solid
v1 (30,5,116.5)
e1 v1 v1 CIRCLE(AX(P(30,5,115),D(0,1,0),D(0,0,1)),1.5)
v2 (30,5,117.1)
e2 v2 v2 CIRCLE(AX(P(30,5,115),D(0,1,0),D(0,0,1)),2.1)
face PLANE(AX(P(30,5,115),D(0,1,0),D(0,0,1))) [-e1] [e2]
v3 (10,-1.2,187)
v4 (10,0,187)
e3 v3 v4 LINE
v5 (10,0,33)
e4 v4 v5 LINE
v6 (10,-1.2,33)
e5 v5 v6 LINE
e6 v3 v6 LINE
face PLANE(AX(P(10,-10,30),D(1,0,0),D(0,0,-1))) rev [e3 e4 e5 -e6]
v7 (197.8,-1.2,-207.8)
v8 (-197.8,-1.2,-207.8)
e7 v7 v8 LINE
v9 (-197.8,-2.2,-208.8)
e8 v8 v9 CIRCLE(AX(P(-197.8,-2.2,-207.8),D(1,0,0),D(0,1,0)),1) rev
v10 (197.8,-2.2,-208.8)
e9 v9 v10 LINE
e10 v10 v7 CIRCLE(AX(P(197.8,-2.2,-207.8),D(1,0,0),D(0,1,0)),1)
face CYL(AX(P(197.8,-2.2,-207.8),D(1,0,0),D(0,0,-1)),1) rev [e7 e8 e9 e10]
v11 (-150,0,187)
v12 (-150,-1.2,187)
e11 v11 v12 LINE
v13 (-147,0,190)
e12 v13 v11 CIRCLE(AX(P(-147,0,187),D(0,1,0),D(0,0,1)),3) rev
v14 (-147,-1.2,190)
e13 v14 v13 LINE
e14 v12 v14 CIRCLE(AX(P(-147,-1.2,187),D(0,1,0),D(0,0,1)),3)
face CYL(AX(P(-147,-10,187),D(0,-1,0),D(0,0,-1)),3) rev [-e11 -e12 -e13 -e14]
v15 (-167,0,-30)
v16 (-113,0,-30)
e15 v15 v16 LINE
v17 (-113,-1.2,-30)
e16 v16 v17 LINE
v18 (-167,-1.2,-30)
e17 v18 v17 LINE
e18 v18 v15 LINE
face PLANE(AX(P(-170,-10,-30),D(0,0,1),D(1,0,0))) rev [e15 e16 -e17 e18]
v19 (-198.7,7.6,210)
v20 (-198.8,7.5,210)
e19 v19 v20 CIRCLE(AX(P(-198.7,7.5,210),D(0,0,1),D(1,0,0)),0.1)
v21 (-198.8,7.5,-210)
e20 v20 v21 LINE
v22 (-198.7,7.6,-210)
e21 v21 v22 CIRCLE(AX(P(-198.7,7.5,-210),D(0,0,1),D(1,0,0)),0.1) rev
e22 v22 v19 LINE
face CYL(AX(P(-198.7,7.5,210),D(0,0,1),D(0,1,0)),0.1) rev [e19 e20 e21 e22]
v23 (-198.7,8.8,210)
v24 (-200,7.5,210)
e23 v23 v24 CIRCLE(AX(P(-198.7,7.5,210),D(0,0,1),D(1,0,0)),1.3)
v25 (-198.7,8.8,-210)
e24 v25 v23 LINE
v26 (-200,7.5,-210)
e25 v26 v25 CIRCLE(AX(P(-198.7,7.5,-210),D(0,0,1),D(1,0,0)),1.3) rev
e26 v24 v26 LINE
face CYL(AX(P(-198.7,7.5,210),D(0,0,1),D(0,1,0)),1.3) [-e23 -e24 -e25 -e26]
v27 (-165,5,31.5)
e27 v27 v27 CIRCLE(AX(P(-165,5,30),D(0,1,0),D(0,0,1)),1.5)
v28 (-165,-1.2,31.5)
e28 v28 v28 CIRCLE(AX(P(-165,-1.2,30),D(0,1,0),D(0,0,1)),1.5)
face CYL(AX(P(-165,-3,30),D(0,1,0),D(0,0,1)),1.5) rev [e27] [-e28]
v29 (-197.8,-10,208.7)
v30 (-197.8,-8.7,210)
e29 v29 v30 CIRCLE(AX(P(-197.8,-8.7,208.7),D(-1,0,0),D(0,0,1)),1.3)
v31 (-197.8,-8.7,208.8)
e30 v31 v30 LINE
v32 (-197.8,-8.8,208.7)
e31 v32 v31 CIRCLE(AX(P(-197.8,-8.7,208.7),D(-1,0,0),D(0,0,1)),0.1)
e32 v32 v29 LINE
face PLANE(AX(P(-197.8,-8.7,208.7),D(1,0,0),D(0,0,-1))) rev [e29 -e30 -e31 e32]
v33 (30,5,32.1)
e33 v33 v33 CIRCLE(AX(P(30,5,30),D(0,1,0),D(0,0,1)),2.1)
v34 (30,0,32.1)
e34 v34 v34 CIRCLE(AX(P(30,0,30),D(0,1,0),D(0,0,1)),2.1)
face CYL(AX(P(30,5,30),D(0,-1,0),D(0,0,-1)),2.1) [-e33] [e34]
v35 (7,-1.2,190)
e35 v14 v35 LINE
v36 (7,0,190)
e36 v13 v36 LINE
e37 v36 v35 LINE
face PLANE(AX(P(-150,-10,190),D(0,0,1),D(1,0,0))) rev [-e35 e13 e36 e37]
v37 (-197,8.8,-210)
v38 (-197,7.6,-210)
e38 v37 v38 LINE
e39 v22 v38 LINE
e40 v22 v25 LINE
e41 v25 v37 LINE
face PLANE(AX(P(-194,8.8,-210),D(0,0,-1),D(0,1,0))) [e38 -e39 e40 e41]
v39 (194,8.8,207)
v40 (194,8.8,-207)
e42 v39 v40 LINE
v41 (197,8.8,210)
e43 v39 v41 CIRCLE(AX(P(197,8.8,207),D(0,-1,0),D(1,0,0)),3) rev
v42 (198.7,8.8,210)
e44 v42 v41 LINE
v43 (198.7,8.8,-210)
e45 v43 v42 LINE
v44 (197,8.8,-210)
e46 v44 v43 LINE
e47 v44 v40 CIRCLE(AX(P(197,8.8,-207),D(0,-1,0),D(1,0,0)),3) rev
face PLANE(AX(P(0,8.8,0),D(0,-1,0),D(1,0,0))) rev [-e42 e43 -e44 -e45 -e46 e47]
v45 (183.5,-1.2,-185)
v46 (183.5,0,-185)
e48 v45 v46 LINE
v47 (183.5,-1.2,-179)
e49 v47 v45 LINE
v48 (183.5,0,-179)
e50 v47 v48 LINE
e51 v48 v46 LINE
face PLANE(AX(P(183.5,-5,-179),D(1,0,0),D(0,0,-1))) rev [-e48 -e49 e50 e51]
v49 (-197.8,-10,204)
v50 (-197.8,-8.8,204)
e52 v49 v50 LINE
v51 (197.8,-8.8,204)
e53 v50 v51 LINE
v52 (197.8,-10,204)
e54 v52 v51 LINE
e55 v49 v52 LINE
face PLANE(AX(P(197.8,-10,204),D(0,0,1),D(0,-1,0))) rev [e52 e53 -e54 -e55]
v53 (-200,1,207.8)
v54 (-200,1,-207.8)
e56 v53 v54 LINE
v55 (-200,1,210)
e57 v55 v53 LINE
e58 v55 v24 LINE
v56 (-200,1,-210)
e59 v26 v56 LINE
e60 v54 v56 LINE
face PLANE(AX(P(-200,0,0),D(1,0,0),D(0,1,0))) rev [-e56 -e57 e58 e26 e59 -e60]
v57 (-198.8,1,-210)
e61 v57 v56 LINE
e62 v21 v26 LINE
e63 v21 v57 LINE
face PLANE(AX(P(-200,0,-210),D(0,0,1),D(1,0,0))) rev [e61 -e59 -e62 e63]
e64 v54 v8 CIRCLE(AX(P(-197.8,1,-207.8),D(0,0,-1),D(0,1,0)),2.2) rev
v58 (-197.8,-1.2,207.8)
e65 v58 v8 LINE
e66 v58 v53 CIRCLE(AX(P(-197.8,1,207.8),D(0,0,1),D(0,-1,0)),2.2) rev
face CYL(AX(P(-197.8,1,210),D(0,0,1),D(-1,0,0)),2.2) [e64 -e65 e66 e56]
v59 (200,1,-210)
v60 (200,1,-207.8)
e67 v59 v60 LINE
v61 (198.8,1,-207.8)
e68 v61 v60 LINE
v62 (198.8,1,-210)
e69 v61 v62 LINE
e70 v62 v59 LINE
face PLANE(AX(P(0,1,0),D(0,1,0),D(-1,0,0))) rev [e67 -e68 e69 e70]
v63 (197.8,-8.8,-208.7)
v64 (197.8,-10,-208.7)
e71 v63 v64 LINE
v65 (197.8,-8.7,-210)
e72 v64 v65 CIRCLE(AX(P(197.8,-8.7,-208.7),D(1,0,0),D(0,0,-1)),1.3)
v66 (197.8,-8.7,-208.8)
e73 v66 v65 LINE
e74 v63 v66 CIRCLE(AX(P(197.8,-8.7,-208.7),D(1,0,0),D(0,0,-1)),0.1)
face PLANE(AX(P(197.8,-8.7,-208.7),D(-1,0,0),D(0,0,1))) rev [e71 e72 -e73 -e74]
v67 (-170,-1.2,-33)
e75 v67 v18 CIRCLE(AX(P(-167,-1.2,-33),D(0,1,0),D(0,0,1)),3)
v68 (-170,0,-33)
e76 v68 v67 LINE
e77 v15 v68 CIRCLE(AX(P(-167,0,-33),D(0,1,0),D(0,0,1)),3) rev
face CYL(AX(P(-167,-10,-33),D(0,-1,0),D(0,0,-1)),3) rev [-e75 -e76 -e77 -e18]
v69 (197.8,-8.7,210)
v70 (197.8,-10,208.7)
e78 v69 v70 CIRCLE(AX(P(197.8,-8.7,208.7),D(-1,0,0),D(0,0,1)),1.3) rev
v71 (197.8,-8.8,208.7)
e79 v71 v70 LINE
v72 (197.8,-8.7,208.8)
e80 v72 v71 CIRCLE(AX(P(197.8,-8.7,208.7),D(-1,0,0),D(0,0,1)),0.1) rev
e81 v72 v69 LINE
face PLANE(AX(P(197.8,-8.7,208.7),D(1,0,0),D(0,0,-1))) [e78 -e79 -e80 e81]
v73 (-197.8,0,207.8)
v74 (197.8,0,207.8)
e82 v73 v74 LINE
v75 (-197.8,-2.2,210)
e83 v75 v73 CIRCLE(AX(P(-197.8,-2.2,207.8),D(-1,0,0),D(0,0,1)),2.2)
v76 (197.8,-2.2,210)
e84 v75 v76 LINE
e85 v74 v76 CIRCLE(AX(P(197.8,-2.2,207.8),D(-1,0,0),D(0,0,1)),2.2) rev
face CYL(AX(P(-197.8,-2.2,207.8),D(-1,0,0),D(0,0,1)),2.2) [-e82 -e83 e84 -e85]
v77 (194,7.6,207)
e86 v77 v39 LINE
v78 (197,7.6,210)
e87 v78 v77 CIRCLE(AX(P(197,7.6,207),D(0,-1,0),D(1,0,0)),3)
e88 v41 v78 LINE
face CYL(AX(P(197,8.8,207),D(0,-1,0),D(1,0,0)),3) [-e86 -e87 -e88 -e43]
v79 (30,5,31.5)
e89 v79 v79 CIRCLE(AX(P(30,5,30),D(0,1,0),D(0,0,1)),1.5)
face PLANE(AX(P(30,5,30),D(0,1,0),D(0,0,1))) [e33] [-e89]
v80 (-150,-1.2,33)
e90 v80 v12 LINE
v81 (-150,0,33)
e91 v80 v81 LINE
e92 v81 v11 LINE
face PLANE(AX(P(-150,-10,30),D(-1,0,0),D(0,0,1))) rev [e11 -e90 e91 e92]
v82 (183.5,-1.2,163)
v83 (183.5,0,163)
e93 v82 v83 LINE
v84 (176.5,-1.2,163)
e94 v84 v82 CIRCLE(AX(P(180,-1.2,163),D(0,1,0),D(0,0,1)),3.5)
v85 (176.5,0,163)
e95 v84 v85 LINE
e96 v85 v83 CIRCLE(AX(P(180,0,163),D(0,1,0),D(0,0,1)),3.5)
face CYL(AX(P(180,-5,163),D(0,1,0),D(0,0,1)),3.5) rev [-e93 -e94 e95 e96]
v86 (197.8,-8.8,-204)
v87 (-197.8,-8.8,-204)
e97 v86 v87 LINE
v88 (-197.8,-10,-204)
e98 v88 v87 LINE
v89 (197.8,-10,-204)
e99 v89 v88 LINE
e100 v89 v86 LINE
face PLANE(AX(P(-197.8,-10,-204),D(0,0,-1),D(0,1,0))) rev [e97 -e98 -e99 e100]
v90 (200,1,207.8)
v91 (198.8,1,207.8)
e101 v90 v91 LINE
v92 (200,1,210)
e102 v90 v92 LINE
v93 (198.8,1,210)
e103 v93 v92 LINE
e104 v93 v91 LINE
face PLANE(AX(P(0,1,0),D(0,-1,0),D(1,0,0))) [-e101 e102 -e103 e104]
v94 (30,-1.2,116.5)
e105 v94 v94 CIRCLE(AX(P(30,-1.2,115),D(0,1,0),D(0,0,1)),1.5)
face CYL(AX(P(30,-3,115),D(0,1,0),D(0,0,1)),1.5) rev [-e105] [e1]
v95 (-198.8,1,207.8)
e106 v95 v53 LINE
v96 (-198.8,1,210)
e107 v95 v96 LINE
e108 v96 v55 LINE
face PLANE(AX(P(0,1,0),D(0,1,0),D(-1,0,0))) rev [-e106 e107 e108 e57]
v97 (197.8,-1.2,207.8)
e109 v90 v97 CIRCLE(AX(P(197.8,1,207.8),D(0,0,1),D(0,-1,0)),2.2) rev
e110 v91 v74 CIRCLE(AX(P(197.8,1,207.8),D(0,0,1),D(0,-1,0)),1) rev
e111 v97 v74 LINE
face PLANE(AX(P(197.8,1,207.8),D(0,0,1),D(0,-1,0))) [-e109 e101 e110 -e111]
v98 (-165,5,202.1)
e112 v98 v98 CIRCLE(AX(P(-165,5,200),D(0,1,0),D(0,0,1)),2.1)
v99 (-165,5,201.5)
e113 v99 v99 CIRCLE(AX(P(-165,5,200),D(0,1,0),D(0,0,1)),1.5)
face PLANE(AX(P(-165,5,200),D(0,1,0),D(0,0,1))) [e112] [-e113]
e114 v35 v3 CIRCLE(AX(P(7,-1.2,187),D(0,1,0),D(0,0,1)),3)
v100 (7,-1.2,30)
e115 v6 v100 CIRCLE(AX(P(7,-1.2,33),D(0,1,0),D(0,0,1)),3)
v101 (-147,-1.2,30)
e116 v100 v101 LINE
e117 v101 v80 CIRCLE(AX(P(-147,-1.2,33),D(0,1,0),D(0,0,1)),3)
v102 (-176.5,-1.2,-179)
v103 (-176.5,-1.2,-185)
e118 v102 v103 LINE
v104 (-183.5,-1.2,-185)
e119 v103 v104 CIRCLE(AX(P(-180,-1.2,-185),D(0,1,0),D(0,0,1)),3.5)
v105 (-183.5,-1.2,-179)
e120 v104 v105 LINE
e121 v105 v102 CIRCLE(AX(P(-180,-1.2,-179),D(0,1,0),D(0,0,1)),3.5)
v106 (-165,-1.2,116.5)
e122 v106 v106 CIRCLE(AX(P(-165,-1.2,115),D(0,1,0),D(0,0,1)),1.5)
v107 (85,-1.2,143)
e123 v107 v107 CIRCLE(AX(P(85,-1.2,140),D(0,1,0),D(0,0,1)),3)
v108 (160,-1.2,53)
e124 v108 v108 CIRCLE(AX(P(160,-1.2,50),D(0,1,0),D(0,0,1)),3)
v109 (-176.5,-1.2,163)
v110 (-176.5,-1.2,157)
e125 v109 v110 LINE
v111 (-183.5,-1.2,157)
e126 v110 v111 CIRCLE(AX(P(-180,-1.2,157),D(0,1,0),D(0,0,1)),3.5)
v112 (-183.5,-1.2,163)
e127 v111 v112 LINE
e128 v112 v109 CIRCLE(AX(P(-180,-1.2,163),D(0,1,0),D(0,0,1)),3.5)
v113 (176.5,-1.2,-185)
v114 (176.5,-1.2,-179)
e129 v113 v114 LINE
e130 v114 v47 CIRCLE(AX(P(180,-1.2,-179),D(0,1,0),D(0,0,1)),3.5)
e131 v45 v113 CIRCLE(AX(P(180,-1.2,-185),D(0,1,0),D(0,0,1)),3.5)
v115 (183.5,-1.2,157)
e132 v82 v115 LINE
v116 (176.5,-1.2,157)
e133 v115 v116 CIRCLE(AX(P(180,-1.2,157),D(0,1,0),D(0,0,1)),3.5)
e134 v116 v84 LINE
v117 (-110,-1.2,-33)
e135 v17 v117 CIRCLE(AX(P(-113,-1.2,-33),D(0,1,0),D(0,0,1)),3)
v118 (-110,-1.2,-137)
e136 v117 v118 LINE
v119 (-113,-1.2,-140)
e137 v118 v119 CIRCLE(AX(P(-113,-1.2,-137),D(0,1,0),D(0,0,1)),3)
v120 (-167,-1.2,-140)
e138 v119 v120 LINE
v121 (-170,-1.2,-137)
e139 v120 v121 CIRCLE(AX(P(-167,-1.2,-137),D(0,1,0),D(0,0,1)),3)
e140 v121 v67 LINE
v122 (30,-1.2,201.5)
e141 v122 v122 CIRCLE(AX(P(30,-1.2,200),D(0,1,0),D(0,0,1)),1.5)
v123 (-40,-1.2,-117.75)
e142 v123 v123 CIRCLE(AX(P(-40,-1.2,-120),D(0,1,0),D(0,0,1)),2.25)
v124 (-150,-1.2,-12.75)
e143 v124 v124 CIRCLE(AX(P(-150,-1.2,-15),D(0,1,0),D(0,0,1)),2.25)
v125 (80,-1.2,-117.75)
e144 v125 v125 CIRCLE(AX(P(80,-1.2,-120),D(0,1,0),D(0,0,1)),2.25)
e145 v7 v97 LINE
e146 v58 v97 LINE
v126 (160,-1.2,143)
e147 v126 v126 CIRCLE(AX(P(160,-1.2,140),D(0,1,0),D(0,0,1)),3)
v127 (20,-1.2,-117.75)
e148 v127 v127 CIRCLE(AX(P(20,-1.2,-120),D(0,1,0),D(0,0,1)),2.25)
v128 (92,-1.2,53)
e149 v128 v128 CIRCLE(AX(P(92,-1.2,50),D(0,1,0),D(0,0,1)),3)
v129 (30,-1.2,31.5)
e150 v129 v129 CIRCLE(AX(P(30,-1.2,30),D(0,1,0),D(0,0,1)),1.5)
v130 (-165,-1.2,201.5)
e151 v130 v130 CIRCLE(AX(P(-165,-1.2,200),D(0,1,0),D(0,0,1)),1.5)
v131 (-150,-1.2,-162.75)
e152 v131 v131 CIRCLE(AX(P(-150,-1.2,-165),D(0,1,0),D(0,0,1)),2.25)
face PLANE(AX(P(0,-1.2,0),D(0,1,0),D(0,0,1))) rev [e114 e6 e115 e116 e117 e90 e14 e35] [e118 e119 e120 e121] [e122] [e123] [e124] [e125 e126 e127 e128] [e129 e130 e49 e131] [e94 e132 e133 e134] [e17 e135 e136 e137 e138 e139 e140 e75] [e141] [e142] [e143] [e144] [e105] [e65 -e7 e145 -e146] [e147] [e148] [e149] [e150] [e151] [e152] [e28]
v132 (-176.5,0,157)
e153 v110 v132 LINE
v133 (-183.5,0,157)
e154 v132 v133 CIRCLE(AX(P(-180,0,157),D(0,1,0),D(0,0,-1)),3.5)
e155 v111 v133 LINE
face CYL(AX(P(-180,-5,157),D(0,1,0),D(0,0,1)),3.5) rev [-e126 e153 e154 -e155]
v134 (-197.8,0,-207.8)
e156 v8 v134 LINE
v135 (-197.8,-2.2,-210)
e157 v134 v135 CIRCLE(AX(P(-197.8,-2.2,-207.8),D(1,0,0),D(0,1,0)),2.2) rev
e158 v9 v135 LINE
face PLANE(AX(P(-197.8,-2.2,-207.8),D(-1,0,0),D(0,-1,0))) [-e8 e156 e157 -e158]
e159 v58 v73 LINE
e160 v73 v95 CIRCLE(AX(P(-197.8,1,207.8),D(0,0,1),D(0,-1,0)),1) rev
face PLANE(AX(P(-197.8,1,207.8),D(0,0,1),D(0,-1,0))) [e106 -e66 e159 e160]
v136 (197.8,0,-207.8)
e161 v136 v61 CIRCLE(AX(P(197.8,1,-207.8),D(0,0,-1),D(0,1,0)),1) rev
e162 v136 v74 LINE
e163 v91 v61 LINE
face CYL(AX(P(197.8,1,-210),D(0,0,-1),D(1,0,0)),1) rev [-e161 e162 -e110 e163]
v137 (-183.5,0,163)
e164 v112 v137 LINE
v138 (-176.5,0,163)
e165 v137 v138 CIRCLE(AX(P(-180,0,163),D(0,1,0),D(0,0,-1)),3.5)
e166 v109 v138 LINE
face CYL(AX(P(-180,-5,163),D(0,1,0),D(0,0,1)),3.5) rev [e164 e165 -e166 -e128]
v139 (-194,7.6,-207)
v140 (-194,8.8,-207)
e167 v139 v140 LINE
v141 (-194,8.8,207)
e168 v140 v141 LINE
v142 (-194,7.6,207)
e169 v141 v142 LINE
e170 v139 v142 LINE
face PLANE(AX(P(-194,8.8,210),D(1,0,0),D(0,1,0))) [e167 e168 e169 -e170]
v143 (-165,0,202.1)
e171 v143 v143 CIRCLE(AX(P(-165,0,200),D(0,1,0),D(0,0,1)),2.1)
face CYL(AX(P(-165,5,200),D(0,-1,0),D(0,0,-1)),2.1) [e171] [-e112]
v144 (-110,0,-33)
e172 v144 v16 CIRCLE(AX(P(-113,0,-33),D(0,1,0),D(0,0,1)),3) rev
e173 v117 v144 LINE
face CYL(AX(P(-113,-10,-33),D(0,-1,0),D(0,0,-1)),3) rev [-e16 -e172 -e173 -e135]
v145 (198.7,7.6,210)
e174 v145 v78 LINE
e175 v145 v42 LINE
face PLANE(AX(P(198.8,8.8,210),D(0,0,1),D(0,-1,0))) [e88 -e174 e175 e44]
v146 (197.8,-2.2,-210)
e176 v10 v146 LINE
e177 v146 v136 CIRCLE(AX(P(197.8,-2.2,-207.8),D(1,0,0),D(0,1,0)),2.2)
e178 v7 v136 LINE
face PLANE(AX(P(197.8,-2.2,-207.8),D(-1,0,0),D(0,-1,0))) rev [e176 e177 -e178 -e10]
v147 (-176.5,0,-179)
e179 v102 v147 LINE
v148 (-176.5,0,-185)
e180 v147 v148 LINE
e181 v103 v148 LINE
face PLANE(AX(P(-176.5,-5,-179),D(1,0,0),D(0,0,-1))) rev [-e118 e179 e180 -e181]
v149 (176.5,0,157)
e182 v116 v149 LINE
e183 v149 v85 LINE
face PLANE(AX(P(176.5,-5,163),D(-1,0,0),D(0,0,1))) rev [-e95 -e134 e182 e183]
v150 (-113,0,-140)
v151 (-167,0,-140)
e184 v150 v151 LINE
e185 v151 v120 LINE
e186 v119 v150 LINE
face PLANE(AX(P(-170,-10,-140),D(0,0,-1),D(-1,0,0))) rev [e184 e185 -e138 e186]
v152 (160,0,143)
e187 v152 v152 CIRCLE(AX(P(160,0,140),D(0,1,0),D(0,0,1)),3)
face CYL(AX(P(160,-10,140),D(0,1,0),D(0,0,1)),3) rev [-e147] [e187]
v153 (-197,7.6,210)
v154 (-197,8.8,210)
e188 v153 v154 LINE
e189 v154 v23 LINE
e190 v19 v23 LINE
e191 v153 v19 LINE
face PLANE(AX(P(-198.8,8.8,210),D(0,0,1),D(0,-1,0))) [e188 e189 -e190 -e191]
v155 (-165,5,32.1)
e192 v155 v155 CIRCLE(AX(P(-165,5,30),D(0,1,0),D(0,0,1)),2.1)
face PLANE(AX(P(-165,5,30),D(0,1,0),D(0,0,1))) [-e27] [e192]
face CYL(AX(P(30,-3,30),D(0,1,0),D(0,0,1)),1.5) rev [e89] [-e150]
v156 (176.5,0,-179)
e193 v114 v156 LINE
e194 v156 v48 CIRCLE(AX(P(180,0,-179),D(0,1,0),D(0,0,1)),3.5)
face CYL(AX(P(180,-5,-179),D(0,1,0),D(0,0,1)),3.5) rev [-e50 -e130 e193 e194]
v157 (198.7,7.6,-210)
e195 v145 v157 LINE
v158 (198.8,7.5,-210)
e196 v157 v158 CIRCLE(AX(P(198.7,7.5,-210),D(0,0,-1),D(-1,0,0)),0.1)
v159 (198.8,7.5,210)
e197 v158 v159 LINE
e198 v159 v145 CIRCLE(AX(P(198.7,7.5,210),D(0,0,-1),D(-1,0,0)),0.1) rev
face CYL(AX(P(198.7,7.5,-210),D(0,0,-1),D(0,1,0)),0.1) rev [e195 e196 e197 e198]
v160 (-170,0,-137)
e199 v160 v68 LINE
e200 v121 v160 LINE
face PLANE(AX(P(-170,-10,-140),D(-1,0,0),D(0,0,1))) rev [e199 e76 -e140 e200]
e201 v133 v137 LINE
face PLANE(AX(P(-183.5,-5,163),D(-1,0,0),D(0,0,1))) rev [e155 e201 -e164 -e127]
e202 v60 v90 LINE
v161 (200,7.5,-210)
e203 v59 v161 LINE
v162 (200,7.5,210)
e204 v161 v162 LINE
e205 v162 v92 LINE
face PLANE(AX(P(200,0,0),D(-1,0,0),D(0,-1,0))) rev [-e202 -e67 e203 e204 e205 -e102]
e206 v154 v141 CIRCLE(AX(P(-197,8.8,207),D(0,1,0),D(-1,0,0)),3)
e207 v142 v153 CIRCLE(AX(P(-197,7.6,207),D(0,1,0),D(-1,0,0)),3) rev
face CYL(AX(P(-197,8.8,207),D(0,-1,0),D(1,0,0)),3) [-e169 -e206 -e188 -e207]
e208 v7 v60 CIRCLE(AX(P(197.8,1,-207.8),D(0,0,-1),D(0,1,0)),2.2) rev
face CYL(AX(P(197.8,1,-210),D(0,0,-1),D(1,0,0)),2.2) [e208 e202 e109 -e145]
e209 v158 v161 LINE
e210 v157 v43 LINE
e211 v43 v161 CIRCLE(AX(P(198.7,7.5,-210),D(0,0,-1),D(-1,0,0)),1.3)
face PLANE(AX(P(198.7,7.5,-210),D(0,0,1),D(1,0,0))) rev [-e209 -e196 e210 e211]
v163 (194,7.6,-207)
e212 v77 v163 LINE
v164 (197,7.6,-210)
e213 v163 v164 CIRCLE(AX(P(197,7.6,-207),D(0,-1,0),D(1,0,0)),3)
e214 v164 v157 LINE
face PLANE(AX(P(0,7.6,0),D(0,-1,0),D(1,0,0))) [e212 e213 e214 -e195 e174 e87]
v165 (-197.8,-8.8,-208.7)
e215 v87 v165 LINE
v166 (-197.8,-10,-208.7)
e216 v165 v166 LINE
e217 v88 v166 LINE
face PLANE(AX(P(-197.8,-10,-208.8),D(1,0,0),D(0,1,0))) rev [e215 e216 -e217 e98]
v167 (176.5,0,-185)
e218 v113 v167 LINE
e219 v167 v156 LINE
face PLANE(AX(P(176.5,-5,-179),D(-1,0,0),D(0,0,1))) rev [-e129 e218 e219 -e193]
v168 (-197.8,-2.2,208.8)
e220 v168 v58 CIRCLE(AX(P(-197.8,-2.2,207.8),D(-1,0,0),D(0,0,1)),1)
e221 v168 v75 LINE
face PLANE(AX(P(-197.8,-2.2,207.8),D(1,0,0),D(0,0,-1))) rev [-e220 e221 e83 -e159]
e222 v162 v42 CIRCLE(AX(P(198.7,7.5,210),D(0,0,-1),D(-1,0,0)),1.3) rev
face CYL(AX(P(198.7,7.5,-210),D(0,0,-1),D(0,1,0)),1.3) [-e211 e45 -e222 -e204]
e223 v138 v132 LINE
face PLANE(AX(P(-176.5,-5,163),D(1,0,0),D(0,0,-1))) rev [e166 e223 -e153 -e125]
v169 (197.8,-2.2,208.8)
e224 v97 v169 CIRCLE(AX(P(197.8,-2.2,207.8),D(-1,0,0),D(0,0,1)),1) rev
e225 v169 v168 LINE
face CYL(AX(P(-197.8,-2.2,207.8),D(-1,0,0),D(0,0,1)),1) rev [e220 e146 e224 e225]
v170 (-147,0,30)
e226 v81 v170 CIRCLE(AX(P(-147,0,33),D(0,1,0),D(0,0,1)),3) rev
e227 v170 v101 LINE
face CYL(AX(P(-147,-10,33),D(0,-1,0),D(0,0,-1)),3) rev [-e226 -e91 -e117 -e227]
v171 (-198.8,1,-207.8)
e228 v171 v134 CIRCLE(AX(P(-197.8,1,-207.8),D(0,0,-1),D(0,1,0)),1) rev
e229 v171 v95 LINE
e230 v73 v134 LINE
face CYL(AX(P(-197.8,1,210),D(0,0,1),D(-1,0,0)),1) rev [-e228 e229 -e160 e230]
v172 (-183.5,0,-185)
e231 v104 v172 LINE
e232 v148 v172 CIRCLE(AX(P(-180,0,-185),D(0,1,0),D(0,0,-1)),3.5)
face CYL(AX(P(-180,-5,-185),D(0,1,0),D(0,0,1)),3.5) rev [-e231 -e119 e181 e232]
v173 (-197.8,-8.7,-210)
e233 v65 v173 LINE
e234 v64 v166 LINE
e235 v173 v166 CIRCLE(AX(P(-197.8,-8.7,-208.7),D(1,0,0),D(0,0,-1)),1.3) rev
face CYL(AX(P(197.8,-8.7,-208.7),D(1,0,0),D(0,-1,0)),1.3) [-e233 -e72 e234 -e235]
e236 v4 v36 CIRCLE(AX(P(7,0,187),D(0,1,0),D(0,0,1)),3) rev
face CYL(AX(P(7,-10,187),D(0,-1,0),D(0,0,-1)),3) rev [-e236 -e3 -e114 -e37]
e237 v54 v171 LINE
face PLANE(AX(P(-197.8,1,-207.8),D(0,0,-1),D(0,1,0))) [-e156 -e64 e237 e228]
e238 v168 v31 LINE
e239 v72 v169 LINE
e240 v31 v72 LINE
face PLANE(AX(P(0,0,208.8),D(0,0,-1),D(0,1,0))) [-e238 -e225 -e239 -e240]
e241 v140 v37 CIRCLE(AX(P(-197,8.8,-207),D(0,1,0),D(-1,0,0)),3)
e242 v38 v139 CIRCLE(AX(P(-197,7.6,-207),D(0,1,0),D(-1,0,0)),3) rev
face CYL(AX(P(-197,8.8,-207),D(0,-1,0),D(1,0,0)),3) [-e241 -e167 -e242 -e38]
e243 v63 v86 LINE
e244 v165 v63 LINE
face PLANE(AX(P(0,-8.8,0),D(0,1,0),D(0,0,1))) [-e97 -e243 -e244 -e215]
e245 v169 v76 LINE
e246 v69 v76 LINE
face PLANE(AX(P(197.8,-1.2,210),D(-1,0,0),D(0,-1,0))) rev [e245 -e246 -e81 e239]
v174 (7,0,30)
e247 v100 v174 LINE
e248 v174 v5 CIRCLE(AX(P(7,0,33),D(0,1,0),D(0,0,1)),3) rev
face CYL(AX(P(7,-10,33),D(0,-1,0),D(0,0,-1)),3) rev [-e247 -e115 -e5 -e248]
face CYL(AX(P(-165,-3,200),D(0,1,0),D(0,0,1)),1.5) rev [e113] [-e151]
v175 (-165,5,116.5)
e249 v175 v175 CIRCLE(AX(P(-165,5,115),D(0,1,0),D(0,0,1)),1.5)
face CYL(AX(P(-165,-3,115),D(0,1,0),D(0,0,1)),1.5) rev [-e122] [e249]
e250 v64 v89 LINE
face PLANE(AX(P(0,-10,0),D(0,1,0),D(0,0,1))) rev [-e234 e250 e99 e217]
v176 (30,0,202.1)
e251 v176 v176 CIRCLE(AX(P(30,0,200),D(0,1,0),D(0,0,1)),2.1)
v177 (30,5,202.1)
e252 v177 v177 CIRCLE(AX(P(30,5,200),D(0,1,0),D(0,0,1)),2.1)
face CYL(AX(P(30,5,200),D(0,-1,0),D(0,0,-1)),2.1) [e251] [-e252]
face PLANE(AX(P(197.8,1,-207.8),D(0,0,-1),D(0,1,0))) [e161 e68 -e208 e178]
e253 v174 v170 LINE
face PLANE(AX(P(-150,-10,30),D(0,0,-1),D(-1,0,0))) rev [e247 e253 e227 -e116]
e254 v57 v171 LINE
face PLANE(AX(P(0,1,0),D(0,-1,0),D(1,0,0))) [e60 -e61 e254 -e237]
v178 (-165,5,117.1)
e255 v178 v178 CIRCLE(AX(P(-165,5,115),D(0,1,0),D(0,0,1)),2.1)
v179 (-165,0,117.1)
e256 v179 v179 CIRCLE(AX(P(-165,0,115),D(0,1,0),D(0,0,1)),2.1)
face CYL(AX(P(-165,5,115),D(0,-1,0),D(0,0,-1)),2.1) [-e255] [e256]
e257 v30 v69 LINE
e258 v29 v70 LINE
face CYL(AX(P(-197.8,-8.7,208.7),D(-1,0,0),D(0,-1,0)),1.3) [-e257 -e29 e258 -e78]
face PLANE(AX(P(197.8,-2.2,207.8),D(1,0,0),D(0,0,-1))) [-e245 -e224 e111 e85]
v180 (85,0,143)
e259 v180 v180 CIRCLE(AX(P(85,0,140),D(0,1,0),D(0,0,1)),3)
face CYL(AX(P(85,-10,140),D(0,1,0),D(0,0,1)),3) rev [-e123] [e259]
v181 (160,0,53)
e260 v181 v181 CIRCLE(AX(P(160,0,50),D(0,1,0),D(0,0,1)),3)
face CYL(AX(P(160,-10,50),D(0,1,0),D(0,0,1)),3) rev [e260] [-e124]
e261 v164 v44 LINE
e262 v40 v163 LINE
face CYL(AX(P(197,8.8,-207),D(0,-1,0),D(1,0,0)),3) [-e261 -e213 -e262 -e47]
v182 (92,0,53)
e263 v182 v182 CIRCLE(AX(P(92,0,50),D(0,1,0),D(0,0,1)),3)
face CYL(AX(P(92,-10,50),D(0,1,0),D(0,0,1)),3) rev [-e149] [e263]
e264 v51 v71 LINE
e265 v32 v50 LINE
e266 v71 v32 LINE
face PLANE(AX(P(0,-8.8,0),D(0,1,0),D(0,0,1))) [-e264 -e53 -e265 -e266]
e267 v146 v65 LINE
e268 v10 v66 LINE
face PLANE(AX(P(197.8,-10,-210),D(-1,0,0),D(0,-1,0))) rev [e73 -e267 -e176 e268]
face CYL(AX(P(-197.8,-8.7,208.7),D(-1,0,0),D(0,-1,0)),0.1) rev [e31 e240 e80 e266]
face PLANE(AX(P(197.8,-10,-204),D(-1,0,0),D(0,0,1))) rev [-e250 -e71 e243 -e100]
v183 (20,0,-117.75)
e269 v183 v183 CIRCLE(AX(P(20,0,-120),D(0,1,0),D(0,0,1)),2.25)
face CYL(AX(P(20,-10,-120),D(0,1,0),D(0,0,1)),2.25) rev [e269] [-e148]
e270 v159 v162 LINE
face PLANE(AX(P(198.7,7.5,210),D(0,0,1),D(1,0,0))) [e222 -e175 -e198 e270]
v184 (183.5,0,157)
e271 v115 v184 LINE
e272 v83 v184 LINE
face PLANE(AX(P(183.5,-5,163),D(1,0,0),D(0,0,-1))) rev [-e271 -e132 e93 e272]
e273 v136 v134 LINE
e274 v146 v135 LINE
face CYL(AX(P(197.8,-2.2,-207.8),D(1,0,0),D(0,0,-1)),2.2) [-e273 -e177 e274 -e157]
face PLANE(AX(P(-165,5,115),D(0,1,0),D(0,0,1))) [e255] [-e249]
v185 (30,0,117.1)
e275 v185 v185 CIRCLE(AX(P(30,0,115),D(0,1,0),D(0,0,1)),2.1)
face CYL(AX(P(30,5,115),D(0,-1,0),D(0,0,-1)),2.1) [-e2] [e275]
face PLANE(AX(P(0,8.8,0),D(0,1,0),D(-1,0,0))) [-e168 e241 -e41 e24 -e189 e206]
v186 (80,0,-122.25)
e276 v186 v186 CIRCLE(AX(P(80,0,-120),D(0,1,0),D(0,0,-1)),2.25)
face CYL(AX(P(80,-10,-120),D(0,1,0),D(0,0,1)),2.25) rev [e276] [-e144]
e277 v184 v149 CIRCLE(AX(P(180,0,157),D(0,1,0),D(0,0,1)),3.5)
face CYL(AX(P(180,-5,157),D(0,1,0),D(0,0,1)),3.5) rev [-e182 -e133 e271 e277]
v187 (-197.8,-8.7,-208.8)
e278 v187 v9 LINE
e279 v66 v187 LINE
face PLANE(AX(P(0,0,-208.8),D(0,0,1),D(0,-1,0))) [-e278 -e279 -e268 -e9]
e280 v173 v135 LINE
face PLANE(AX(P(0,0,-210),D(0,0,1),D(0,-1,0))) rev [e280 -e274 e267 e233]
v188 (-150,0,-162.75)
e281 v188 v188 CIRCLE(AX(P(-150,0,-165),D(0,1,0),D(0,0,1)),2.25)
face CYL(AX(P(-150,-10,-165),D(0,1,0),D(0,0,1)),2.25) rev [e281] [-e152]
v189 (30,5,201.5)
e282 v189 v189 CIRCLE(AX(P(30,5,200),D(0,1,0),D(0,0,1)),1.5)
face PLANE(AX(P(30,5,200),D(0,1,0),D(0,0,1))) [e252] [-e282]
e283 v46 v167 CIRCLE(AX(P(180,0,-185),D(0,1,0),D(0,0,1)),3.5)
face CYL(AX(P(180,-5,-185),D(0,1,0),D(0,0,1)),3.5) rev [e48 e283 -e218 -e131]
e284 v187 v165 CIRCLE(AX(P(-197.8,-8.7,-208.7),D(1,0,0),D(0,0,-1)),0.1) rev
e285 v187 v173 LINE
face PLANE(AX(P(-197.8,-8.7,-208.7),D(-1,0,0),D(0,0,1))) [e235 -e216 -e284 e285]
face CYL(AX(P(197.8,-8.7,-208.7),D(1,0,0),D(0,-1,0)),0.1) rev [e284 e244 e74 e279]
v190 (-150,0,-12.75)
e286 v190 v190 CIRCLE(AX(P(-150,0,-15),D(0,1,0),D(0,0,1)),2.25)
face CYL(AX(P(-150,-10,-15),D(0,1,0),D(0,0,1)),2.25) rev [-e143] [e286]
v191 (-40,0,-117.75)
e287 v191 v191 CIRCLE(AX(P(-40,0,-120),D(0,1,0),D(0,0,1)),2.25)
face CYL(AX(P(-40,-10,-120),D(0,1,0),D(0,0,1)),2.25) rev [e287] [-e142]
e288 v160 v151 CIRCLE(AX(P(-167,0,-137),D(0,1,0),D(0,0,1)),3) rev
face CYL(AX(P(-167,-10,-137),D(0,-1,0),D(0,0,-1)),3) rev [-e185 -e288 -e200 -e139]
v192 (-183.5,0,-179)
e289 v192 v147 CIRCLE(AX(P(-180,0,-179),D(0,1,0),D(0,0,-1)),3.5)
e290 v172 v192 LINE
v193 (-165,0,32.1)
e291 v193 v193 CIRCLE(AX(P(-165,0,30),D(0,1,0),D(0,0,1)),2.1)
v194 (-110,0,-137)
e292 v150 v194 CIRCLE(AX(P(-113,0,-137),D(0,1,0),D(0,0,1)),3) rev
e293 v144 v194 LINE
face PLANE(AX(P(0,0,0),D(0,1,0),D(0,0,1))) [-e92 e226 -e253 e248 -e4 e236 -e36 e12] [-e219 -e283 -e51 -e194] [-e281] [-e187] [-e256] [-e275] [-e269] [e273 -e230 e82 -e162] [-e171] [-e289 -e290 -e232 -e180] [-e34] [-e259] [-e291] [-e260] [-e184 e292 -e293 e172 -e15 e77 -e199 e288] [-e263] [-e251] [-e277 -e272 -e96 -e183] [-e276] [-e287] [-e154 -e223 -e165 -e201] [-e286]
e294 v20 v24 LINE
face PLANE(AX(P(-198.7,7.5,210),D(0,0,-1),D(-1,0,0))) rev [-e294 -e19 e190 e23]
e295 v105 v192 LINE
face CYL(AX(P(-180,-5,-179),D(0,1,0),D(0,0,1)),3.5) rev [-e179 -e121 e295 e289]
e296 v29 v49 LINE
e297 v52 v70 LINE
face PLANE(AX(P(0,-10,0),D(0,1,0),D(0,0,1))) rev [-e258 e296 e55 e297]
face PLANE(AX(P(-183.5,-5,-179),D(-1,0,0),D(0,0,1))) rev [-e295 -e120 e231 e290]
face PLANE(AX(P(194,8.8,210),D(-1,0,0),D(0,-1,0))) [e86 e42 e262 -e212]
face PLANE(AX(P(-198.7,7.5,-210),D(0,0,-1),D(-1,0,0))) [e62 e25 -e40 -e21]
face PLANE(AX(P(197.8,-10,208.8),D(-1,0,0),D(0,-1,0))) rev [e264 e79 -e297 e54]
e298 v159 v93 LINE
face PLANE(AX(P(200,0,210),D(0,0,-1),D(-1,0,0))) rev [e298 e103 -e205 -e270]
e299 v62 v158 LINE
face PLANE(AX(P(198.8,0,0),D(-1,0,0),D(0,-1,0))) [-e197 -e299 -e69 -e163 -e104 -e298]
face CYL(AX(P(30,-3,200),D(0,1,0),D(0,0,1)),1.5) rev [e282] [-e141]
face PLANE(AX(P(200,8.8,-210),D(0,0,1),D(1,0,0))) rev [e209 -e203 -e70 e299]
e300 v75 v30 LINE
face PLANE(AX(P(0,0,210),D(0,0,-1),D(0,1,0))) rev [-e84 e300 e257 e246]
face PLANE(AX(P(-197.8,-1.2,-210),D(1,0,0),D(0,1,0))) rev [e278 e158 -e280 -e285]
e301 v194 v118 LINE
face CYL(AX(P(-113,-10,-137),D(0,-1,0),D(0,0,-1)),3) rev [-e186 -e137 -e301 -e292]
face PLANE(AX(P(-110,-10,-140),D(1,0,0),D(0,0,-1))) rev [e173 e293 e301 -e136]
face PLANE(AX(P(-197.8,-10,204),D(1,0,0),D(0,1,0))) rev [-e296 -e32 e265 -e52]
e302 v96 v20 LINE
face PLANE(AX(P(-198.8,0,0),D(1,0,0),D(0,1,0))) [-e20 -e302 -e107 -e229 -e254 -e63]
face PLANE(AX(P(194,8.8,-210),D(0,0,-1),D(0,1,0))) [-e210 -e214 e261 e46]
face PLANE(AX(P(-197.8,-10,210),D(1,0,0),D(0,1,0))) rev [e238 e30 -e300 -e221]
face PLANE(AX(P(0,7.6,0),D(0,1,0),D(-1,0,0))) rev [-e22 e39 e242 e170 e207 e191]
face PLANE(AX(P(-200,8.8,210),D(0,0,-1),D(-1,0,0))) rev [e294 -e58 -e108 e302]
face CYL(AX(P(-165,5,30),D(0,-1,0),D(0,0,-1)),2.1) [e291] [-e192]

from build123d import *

# Parameters (mm, degrees)
SKETCH_1_W                         = 400
SKETCH_1_H                         = 420
SM_BASE_FLANGE_1_DEPTH             = 1.2
SM_EDGE_FLANGE_1_STRIP_W           = 6.8
SM_EDGE_FLANGE_1_STRIP_H           = 1.2
SM_EDGE_FLANGE_1_STRIP_CUT_DEPTH   = 420
SM_EDGE_FLANGE_1_STRIP_2_W         = 6.8
SM_EDGE_FLANGE_1_STRIP_2_H         = 1.2
SM_EDGE_FLANGE_1_STRIP_CUT_2_DEPTH = 420
SM_EDGE_FLANGE_1_DEPTH             = 420
SM_EDGE_FLANGE_1_BEND_DEPTH        = 420
SM_EDGE_FLANGE_2_STRIP_W           = 5
SM_EDGE_FLANGE_2_STRIP_H           = 1.2
SM_EDGE_FLANGE_2_STRIP_CUT_DEPTH   = 420
SM_EDGE_FLANGE_2_STRIP_2_W         = 5
SM_EDGE_FLANGE_2_STRIP_2_H         = 1.2
SM_EDGE_FLANGE_2_STRIP_CUT_2_DEPTH = 420
SM_EDGE_FLANGE_2_DEPTH             = 420
SM_EDGE_FLANGE_2_BEND_DEPTH        = 420
SM_START                           = -201
SM_EDGE_FLANGE_3_DEPTH             = 402
SM_EDGE_FLANGE_3_2_DEPTH           = 3.2
SM_START_2                         = 197.8
SM_EDGE_FLANGE_3_3_DEPTH           = 3.2
SM_START_3                         = -197.8
SM_EDGE_FLANGE_3_4_DEPTH           = 395.6
SM_EDGE_FLANGE_4_STRIP_W           = 5
SM_EDGE_FLANGE_4_STRIP_H           = 1.2
SM_EDGE_FLANGE_4_STRIP_CUT_DEPTH   = 395.6
SM_EDGE_FLANGE_4_STRIP_2_W         = 5
SM_EDGE_FLANGE_4_STRIP_2_H         = 1.2
SM_EDGE_FLANGE_4_STRIP_CUT_2_DEPTH = 395.6
SM_EDGE_FLANGE_4_DEPTH             = 395.6
SM_EDGE_FLANGE_4_BEND_DEPTH        = 395.6
FILLET_1_R                         = 3
SKETCH_40_R                        = 2.25
CUT_EXTRUDE_2_DEPTH                = 10
SKETCH_45_R                        = 1.5
CUT_EXTRUDE_3_DEPTH                = 3
SKETCH_48_R                        = 2.25
CUT_EXTRUDE_6_DEPTH                = 10
SKETCH_50_W                        = 60
SKETCH_50_H                        = 110
CUT_EXTRUDE_7_DEPTH                = 10
SKETCH_52_W                        = 160
SKETCH_52_H                        = 160
CUT_EXTRUDE_10_DEPTH               = 10
FILLET_2_R                         = 3
FILLET_4_R                         = 3
EXTRUDE_START                      = 5
SKETCH_54_R                        = 2.1
SKETCH_54_R_2                      = 1.5
EXTRUDE_1_DEPTH                    = 5
CUT_EXTRUDE_11_DEPTH               = 5
SKETCH_56_R                        = 3
CUT_EXTRUDE_12_DEPTH               = 10


with BuildPart() as part:
    # 基体-法兰1: sheet metal written as solids
    # Sketch 1 → 基体-法兰1 (new body)
    with BuildSketch(Plane(origin=(0, 0, 0), x_dir=(1, 0, 0), z_dir=(0, 1, 0))):
        Rectangle(SKETCH_1_W, SKETCH_1_H)
    extrude(amount=-SM_BASE_FLANGE_1_DEPTH)

    # 边线-法兰1: sheet metal written as solids
    # 边线-法兰1 strip (on a plane across the edge) → 边线-法兰1 strip cut (cut)
    with BuildSketch(Plane(origin=(-200, 0, -210), x_dir=(1, 0, 0), z_dir=(0, 0, 1))):
        with Locations((-1.2, -0.6)):
            Rectangle(SM_EDGE_FLANGE_1_STRIP_W, SM_EDGE_FLANGE_1_STRIP_H)
    extrude(amount=SM_EDGE_FLANGE_1_STRIP_CUT_DEPTH, mode=Mode.SUBTRACT)

    # 边线-法兰1 strip 2 (on a plane across the edge) → 边线-法兰1 strip cut 2 (cut)
    with BuildSketch(Plane(origin=(200, 0, 210), x_dir=(-1, 0, 0), z_dir=(0, 0, -1))):
        with Locations((-1.2, -0.6)):
            Rectangle(SM_EDGE_FLANGE_1_STRIP_2_W, SM_EDGE_FLANGE_1_STRIP_2_H)
    extrude(amount=SM_EDGE_FLANGE_1_STRIP_CUT_2_DEPTH, mode=Mode.SUBTRACT)

    # 边线-法兰1 section (on a plane across the edge) → 边线-法兰1 (add)
    with BuildSketch(Plane(origin=(-200, 0, -210), x_dir=(1, 0, 0), z_dir=(0, 0, 1))):
        with BuildLine():
            Line((0, 1), (0, 8.8))
            Line((0, 8.8), (1.2, 8.8))
            Line((1.2, 8.8), (1.2, 1))
            ThreePointArc((1.2, 1), (1.492893219, 0.292893219), (2.2, 0))
            Line((2.2, 0), (2.2, -1.2))
            ThreePointArc((2.2, -1.2), (0.644365081, -0.555634919), (0, 1))
        make_face()
    extrude(amount=SM_EDGE_FLANGE_1_DEPTH)

    # 边线-法兰1 section 2 (on a plane across the edge) → 边线-法兰1 bend (add)
    with BuildSketch(Plane(origin=(200, 0, 210), x_dir=(-1, 0, 0), z_dir=(0, 0, -1))):
        with BuildLine():
            Line((0, 1), (0, 8.8))
            Line((0, 8.8), (1.2, 8.8))
            Line((1.2, 8.8), (1.2, 1))
            ThreePointArc((1.2, 1), (1.492893219, 0.292893219), (2.2, 0))
            Line((2.2, 0), (2.2, -1.2))
            ThreePointArc((2.2, -1.2), (0.644365081, -0.555634919), (0, 1))
        make_face()
    extrude(amount=SM_EDGE_FLANGE_1_BEND_DEPTH)

    # 边线-法兰2: sheet metal written as solids
    # 边线-法兰2 strip (on a plane across the edge) → 边线-法兰2 strip cut (cut)
    with BuildSketch(Plane(origin=(-198.8, 8.8, -210), x_dir=(0, -1, 0), z_dir=(0, 0, 1))):
        with Locations((-1.2, -0.6)):
            Rectangle(SM_EDGE_FLANGE_2_STRIP_W, SM_EDGE_FLANGE_2_STRIP_H)
    extrude(amount=SM_EDGE_FLANGE_2_STRIP_CUT_DEPTH, mode=Mode.SUBTRACT)

    # 边线-法兰2 strip 2 (on a plane across the edge) → 边线-法兰2 strip cut 2 (cut)
    with BuildSketch(Plane(origin=(198.8, 8.8, 210), x_dir=(0, -1, 0), z_dir=(0, 0, -1))):
        with Locations((-1.2, -0.6)):
            Rectangle(SM_EDGE_FLANGE_2_STRIP_2_W, SM_EDGE_FLANGE_2_STRIP_2_H)
    extrude(amount=SM_EDGE_FLANGE_2_STRIP_CUT_2_DEPTH, mode=Mode.SUBTRACT)

    # 边线-法兰2 section (on a plane across the edge) → 边线-法兰2 (add)
    with BuildSketch(Plane(origin=(-198.8, 8.8, -210), x_dir=(0, -1, 0), z_dir=(0, 0, 1))):
        with BuildLine():
            Line((0, 0.1), (0, 4.8))
            Line((0, 4.8), (1.2, 4.8))
            Line((1.2, 4.8), (1.2, 0.1))
            ThreePointArc((1.2, 0.1), (1.229289322, 0.029289322), (1.3, 0))
            Line((1.3, 0), (1.3, -1.2))
            ThreePointArc((1.3, -1.2), (0.380761184, -0.819238816), (0, 0.1))
        make_face()
    extrude(amount=SM_EDGE_FLANGE_2_DEPTH)

    # 边线-法兰2 section 2 (on a plane across the edge) → 边线-法兰2 bend (add)
    with BuildSketch(Plane(origin=(198.8, 8.8, 210), x_dir=(0, -1, 0), z_dir=(0, 0, -1))):
        with BuildLine():
            Line((0, 0.1), (0, 4.8))
            Line((0, 4.8), (1.2, 4.8))
            Line((1.2, 4.8), (1.2, 0.1))
            ThreePointArc((1.2, 0.1), (1.229289322, 0.029289322), (1.3, 0))
            Line((1.3, 0), (1.3, -1.2))
            ThreePointArc((1.3, -1.2), (0.380761184, -0.819238816), (0, 0.1))
        make_face()
    extrude(amount=SM_EDGE_FLANGE_2_BEND_DEPTH)

    # 边线-法兰3: read off the stored shape, not the designer's step
    # 边线-法兰3 outline → 边线-法兰3 (cut)
    with BuildSketch(Plane.YZ.offset(SM_START)):
        with BuildLine():
            Line((1, -210), (1, -207.8))
            Line((1, -207.8), (0, -207.8))
            ThreePointArc((0, -207.8), (-0.323833696, -208.94891253), (-1.2, -209.759591795))
            Line((-1.2, -209.759591795), (-1.2, -210))
            Line((-1.2, -210), (1, -210))
        make_face()
        with BuildLine():
            Line((1, 210), (-1.2, 210))
            Line((-1.2, 210), (-1.2, 209.759591795))
            ThreePointArc((-1.2, 209.759591795), (-0.323833696, 208.94891253), (0, 207.8))
            Line((0, 207.8), (1, 207.8))
            Line((1, 207.8), (1, 210))
        make_face()
    extrude(amount=SM_EDGE_FLANGE_3_DEPTH, mode=Mode.SUBTRACT)

    # Sm Edge Flange 3 2 outline → Sm Edge Flange 3 2 (cut)
    with BuildSketch(Plane.YZ.offset(SM_START)):
        with BuildLine():
            ThreePointArc((-1.2, -209.759591795), (-0.323833696, -208.94891253), (0, -207.8))
            Line((0, -207.8), (-1.2, -207.8))
            Line((-1.2, -207.8), (-1.2, -209.759591795))
        make_face()
        with BuildLine():
            Line((-1.2, 207.8), (0, 207.8))
            ThreePointArc((0, 207.8), (-0.323833696, 208.94891253), (-1.2, 209.759591795))
            Line((-1.2, 209.759591795), (-1.2, 207.8))
        make_face()
    extrude(amount=SM_EDGE_FLANGE_3_2_DEPTH, mode=Mode.SUBTRACT)

    # Sm Edge Flange 3 3 outline → Sm Edge Flange 3 3 (cut)
    with BuildSketch(Plane.YZ.offset(SM_START_2)):
        with BuildLine():
            ThreePointArc((-1.2, -209.759591795), (-0.323833696, -208.94891253), (0, -207.8))
            Line((0, -207.8), (-1.2, -207.8))
            Line((-1.2, -207.8), (-1.2, -209.759591795))
        make_face()
        with BuildLine():
            Line((-1.2, 207.8), (0, 207.8))
            ThreePointArc((0, 207.8), (-0.323833696, 208.94891253), (-1.2, 209.759591795))
            Line((-1.2, 209.759591795), (-1.2, 207.8))
        make_face()
    extrude(amount=SM_EDGE_FLANGE_3_3_DEPTH, mode=Mode.SUBTRACT)

    # Sm Edge Flange 3 4 outline → Sm Edge Flange 3 4 (add)
    with BuildSketch(Plane.YZ.offset(SM_START_3)):
        with BuildLine():
            Line((-1.2, -209.759591795), (-1.2, -207.8))
            ThreePointArc((-1.2, -207.8), (-1.492893219, -208.507106781), (-2.2, -208.8))
            Line((-2.2, -208.8), (-10, -208.8))
            Line((-10, -208.8), (-10, -210))
            Line((-10, -210), (-2.2, -210))
            ThreePointArc((-2.2, -210), (-1.685753924, -209.939053757), (-1.2, -209.759591795))
        make_face()
        with BuildLine():
            ThreePointArc((-2.2, 208.8), (-1.492893219, 208.507106781), (-1.2, 207.8))
            Line((-1.2, 207.8), (-1.2, 209.759591795))
            ThreePointArc((-1.2, 209.759591795), (-1.685753924, 209.939053757), (-2.2, 210))
            Line((-2.2, 210), (-10, 210))
            Line((-10, 210), (-10, 208.8))
            Line((-10, 208.8), (-2.2, 208.8))
        make_face()
    extrude(amount=SM_EDGE_FLANGE_3_4_DEPTH)

    # 边线-法兰4: sheet metal written as solids
    # 边线-法兰4 strip (on a plane across the edge) → 边线-法兰4 strip cut (cut)
    with BuildSketch(Plane(origin=(-197.8, -10, -208.8), x_dir=(0, 1, 0), z_dir=(1, 0, 0))):
        with Locations((-1.2, -0.6)):
            Rectangle(SM_EDGE_FLANGE_4_STRIP_W, SM_EDGE_FLANGE_4_STRIP_H)
    extrude(amount=SM_EDGE_FLANGE_4_STRIP_CUT_DEPTH, mode=Mode.SUBTRACT)

    # 边线-法兰4 strip 2 (on a plane across the edge) → 边线-法兰4 strip cut 2 (cut)
    with BuildSketch(Plane(origin=(197.8, -10, 208.8), x_dir=(0, 1, 0), z_dir=(-1, 0, 0))):
        with Locations((-1.2, -0.6)):
            Rectangle(SM_EDGE_FLANGE_4_STRIP_2_W, SM_EDGE_FLANGE_4_STRIP_2_H)
    extrude(amount=SM_EDGE_FLANGE_4_STRIP_CUT_2_DEPTH, mode=Mode.SUBTRACT)

    # 边线-法兰4 section (on a plane across the edge) → 边线-法兰4 (add)
    with BuildSketch(Plane(origin=(-197.8, -10, -208.8), x_dir=(0, 1, 0), z_dir=(1, 0, 0))):
        with BuildLine():
            Line((0, 0.1), (0, 4.8))
            Line((0, 4.8), (1.2, 4.8))
            Line((1.2, 4.8), (1.2, 0.1))
            ThreePointArc((1.2, 0.1), (1.229289322, 0.029289322), (1.3, 0))
            Line((1.3, 0), (1.3, -1.2))
            ThreePointArc((1.3, -1.2), (0.380761184, -0.819238816), (0, 0.1))
        make_face()
    extrude(amount=SM_EDGE_FLANGE_4_DEPTH)

    # 边线-法兰4 section 2 (on a plane across the edge) → 边线-法兰4 bend (add)
    with BuildSketch(Plane(origin=(197.8, -10, 208.8), x_dir=(0, 1, 0), z_dir=(-1, 0, 0))):
        with BuildLine():
            Line((0, 0.1), (0, 4.8))
            Line((0, 4.8), (1.2, 4.8))
            Line((1.2, 4.8), (1.2, 0.1))
            ThreePointArc((1.2, 0.1), (1.229289322, 0.029289322), (1.3, 0))
            Line((1.3, 0), (1.3, -1.2))
            ThreePointArc((1.3, -1.2), (0.380761184, -0.819238816), (0, 0.1))
        make_face()
    extrude(amount=SM_EDGE_FLANGE_4_BEND_DEPTH)

    # 圆角1
    fillet_1_edges = [part.edges().sort_by_distance(p)[0] for p in [
        (-194, 8.2, -210),
        (-194, 8.2, 210),
        (194, 8.2, 210),
        (194, 8.2, -210),
    ]]
    fillet(fillet_1_edges, radius=FILLET_1_R)

    # 草图40 → 切除-拉伸2 (cut)
    with BuildSketch(Plane(origin=(0, 0, 0), x_dir=(1, 0, 0), z_dir=(0, 1, 0))):
        with Locations(Location((-40, 120, 0), (0, 0, 270))):
            Circle(SKETCH_40_R)
        with Locations(Location((20, 120, 0), (0, 0, 270))):
            Circle(SKETCH_40_R)
        with Locations(Location((80, 120, 0), (0, 0, 270))):
            Circle(SKETCH_40_R)
    extrude(amount=-CUT_EXTRUDE_2_DEPTH, mode=Mode.SUBTRACT)

    # 草图45 → 切除-拉伸3 (cut)
    with BuildSketch(Plane(origin=(0, 0, 0), x_dir=(1, 0, 0), z_dir=(0, 1, 0))):
        with Locations(Location((-165, -30, 0), (0, 0, 270))):
            Circle(SKETCH_45_R)
        with Locations(Location((30, -200, 0), (0, 0, 270))):
            Circle(SKETCH_45_R)
        with Locations(Location((-165, -200, 0), (0, 0, 270))):
            Circle(SKETCH_45_R)
        with Locations(Location((30, -30, 0), (0, 0, 270))):
            Circle(SKETCH_45_R)
        with Locations(Location((-165, -115, 0), (0, 0, 270))):
            Circle(SKETCH_45_R)
        with Locations(Location((30, -115, 0), (0, 0, 270))):
            Circle(SKETCH_45_R)
    extrude(amount=-CUT_EXTRUDE_3_DEPTH, mode=Mode.SUBTRACT)

    # 草图48 → 切除-拉伸6 (cut)
    with BuildSketch(Plane(origin=(0, 0, 0), x_dir=(1, 0, 0), z_dir=(0, 1, 0))):
        with Locations(Location((-150, 165, 0), (0, 0, 270))):
            Circle(SKETCH_48_R)
        with Locations(Location((-150, 15, 0), (0, 0, 270))):
            Circle(SKETCH_48_R)
    extrude(amount=-CUT_EXTRUDE_6_DEPTH, mode=Mode.SUBTRACT)

    # 草图50 → 切除-拉伸7 (cut)
    with BuildSketch(Plane(origin=(0, 0, 0), x_dir=(1, 0, 0), z_dir=(0, 1, 0))):
        with Locations((-140, 85)):
            Rectangle(SKETCH_50_W, SKETCH_50_H)
    extrude(amount=-CUT_EXTRUDE_7_DEPTH, mode=Mode.SUBTRACT)

    # 草图52 → 切除-拉伸10 (cut)
    with BuildSketch(Plane(origin=(0, 0, 0), x_dir=(1, 0, 0), z_dir=(0, 1, 0))):
        with Locations((-70, -110)):
            Rectangle(SKETCH_52_W, SKETCH_52_H)
    extrude(amount=-CUT_EXTRUDE_10_DEPTH, mode=Mode.SUBTRACT)

    # 圆角2
    fillet_2_edges = [part.edges().sort_by_distance(p)[0] for p in [
        (-170, -0.6, -30),
        (-170, -0.6, -140),
        (-110, -0.6, -140),
        (-110, -0.6, -30),
    ]]
    fillet(fillet_2_edges, radius=FILLET_2_R)

    # 圆角4
    fillet_4_edges = [part.edges().sort_by_distance(p)[0] for p in [
        (-150, -0.6, 190),
        (-150, -0.6, 30),
        (10, -0.6, 30),
        (10, -0.6, 190),
    ]]
    fillet(fillet_4_edges, radius=FILLET_4_R)

    # 草图54 → 凸台-拉伸1 (add)
    # profile 1 of 6: a face of its own
    with BuildSketch(Plane(origin=(0, 0, 0), x_dir=(1, 0, 0), z_dir=(0, 1, 0)).offset(EXTRUDE_START)):
        with Locations(Location((30, -30, 0), (0, 0, 270))):
            Circle(SKETCH_54_R)
        with Locations(Location((30, -30, 0), (0, 0, 270))):
            Circle(SKETCH_54_R_2, mode=Mode.SUBTRACT)
    # profile 2 of 6: a face of its own
    with BuildSketch(Plane(origin=(0, 0, 0), x_dir=(1, 0, 0), z_dir=(0, 1, 0)).offset(EXTRUDE_START)):
        with Locations(Location((-165, -30, 0), (0, 0, 270))):
            Circle(SKETCH_54_R)
        with Locations(Location((-165, -30, 0), (0, 0, 270))):
            Circle(SKETCH_54_R_2, mode=Mode.SUBTRACT)
    # profile 3 of 6: a face of its own
    with BuildSketch(Plane(origin=(0, 0, 0), x_dir=(1, 0, 0), z_dir=(0, 1, 0)).offset(EXTRUDE_START)):
        with Locations(Location((-165, -115, 0), (0, 0, 270))):
            Circle(SKETCH_54_R)
        with Locations(Location((-165, -115, 0), (0, 0, 270))):
            Circle(SKETCH_54_R_2, mode=Mode.SUBTRACT)
    # profile 4 of 6: a face of its own
    with BuildSketch(Plane(origin=(0, 0, 0), x_dir=(1, 0, 0), z_dir=(0, 1, 0)).offset(EXTRUDE_START)):
        with Locations(Location((-165, -200, 0), (0, 0, 270))):
            Circle(SKETCH_54_R)
        with Locations(Location((-165, -200, 0), (0, 0, 270))):
            Circle(SKETCH_54_R_2, mode=Mode.SUBTRACT)
    # profile 5 of 6: a face of its own
    with BuildSketch(Plane(origin=(0, 0, 0), x_dir=(1, 0, 0), z_dir=(0, 1, 0)).offset(EXTRUDE_START)):
        with Locations(Location((30, -115, 0), (0, 0, 270))):
            Circle(SKETCH_54_R)
        with Locations(Location((30, -115, 0), (0, 0, 270))):
            Circle(SKETCH_54_R_2, mode=Mode.SUBTRACT)
    # profile 6 of 6: a face of its own
    with BuildSketch(Plane(origin=(0, 0, 0), x_dir=(1, 0, 0), z_dir=(0, 1, 0)).offset(EXTRUDE_START)):
        with Locations(Location((30, -200, 0), (0, 0, 270))):
            Circle(SKETCH_54_R)
        with Locations(Location((30, -200, 0), (0, 0, 270))):
            Circle(SKETCH_54_R_2, mode=Mode.SUBTRACT)
    extrude(amount=-EXTRUDE_1_DEPTH)

    # 草图55 → 切除-拉伸11 (cut)
    with BuildSketch(Plane(origin=(0, 0, 0), x_dir=(1, 0, 0), z_dir=(0, 1, 0))):
        with BuildLine():
            Line((176.5, -163), (176.5, -157))
            ThreePointArc((176.5, -157), (180, -153.5), (183.5, -157))
            Line((183.5, -157), (183.5, -163))
            ThreePointArc((183.5, -163), (180, -166.5), (176.5, -163))
        make_face()
        with BuildLine():
            Line((176.5, 179), (176.5, 185))
            ThreePointArc((176.5, 185), (180, 188.5), (183.5, 185))
            Line((183.5, 185), (183.5, 179))
            ThreePointArc((183.5, 179), (180, 175.5), (176.5, 179))
        make_face()
        with BuildLine():
            Line((-176.5, 179), (-176.5, 185))
            ThreePointArc((-176.5, 185), (-180, 188.5), (-183.5, 185))
            Line((-183.5, 185), (-183.5, 179))
            ThreePointArc((-183.5, 179), (-180, 175.5), (-176.5, 179))
        make_face()
        with BuildLine():
            Line((-176.5, -163), (-176.5, -157))
            ThreePointArc((-176.5, -157), (-180, -153.5), (-183.5, -157))
            Line((-183.5, -157), (-183.5, -163))
            ThreePointArc((-183.5, -163), (-180, -166.5), (-176.5, -163))
        make_face()
    extrude(amount=-CUT_EXTRUDE_11_DEPTH, mode=Mode.SUBTRACT)

    # 草图56 → 切除-拉伸12 (cut)
    with BuildSketch(Plane(origin=(0, 0, 0), x_dir=(1, 0, 0), z_dir=(0, 1, 0))):
        with Locations(Location((160, -50, 0), (0, 0, 270))):
            Circle(SKETCH_56_R)
        with Locations(Location((92, -50, 0), (0, 0, 270))):
            Circle(SKETCH_56_R)
        with Locations(Location((160, -140, 0), (0, 0, 270))):
            Circle(SKETCH_56_R)
        with Locations(Location((85, -140, 0), (0, 0, 270))):
            Circle(SKETCH_56_R)
    extrude(amount=-CUT_EXTRUDE_12_DEPTH, mode=Mode.SUBTRACT)


solid = part.part
